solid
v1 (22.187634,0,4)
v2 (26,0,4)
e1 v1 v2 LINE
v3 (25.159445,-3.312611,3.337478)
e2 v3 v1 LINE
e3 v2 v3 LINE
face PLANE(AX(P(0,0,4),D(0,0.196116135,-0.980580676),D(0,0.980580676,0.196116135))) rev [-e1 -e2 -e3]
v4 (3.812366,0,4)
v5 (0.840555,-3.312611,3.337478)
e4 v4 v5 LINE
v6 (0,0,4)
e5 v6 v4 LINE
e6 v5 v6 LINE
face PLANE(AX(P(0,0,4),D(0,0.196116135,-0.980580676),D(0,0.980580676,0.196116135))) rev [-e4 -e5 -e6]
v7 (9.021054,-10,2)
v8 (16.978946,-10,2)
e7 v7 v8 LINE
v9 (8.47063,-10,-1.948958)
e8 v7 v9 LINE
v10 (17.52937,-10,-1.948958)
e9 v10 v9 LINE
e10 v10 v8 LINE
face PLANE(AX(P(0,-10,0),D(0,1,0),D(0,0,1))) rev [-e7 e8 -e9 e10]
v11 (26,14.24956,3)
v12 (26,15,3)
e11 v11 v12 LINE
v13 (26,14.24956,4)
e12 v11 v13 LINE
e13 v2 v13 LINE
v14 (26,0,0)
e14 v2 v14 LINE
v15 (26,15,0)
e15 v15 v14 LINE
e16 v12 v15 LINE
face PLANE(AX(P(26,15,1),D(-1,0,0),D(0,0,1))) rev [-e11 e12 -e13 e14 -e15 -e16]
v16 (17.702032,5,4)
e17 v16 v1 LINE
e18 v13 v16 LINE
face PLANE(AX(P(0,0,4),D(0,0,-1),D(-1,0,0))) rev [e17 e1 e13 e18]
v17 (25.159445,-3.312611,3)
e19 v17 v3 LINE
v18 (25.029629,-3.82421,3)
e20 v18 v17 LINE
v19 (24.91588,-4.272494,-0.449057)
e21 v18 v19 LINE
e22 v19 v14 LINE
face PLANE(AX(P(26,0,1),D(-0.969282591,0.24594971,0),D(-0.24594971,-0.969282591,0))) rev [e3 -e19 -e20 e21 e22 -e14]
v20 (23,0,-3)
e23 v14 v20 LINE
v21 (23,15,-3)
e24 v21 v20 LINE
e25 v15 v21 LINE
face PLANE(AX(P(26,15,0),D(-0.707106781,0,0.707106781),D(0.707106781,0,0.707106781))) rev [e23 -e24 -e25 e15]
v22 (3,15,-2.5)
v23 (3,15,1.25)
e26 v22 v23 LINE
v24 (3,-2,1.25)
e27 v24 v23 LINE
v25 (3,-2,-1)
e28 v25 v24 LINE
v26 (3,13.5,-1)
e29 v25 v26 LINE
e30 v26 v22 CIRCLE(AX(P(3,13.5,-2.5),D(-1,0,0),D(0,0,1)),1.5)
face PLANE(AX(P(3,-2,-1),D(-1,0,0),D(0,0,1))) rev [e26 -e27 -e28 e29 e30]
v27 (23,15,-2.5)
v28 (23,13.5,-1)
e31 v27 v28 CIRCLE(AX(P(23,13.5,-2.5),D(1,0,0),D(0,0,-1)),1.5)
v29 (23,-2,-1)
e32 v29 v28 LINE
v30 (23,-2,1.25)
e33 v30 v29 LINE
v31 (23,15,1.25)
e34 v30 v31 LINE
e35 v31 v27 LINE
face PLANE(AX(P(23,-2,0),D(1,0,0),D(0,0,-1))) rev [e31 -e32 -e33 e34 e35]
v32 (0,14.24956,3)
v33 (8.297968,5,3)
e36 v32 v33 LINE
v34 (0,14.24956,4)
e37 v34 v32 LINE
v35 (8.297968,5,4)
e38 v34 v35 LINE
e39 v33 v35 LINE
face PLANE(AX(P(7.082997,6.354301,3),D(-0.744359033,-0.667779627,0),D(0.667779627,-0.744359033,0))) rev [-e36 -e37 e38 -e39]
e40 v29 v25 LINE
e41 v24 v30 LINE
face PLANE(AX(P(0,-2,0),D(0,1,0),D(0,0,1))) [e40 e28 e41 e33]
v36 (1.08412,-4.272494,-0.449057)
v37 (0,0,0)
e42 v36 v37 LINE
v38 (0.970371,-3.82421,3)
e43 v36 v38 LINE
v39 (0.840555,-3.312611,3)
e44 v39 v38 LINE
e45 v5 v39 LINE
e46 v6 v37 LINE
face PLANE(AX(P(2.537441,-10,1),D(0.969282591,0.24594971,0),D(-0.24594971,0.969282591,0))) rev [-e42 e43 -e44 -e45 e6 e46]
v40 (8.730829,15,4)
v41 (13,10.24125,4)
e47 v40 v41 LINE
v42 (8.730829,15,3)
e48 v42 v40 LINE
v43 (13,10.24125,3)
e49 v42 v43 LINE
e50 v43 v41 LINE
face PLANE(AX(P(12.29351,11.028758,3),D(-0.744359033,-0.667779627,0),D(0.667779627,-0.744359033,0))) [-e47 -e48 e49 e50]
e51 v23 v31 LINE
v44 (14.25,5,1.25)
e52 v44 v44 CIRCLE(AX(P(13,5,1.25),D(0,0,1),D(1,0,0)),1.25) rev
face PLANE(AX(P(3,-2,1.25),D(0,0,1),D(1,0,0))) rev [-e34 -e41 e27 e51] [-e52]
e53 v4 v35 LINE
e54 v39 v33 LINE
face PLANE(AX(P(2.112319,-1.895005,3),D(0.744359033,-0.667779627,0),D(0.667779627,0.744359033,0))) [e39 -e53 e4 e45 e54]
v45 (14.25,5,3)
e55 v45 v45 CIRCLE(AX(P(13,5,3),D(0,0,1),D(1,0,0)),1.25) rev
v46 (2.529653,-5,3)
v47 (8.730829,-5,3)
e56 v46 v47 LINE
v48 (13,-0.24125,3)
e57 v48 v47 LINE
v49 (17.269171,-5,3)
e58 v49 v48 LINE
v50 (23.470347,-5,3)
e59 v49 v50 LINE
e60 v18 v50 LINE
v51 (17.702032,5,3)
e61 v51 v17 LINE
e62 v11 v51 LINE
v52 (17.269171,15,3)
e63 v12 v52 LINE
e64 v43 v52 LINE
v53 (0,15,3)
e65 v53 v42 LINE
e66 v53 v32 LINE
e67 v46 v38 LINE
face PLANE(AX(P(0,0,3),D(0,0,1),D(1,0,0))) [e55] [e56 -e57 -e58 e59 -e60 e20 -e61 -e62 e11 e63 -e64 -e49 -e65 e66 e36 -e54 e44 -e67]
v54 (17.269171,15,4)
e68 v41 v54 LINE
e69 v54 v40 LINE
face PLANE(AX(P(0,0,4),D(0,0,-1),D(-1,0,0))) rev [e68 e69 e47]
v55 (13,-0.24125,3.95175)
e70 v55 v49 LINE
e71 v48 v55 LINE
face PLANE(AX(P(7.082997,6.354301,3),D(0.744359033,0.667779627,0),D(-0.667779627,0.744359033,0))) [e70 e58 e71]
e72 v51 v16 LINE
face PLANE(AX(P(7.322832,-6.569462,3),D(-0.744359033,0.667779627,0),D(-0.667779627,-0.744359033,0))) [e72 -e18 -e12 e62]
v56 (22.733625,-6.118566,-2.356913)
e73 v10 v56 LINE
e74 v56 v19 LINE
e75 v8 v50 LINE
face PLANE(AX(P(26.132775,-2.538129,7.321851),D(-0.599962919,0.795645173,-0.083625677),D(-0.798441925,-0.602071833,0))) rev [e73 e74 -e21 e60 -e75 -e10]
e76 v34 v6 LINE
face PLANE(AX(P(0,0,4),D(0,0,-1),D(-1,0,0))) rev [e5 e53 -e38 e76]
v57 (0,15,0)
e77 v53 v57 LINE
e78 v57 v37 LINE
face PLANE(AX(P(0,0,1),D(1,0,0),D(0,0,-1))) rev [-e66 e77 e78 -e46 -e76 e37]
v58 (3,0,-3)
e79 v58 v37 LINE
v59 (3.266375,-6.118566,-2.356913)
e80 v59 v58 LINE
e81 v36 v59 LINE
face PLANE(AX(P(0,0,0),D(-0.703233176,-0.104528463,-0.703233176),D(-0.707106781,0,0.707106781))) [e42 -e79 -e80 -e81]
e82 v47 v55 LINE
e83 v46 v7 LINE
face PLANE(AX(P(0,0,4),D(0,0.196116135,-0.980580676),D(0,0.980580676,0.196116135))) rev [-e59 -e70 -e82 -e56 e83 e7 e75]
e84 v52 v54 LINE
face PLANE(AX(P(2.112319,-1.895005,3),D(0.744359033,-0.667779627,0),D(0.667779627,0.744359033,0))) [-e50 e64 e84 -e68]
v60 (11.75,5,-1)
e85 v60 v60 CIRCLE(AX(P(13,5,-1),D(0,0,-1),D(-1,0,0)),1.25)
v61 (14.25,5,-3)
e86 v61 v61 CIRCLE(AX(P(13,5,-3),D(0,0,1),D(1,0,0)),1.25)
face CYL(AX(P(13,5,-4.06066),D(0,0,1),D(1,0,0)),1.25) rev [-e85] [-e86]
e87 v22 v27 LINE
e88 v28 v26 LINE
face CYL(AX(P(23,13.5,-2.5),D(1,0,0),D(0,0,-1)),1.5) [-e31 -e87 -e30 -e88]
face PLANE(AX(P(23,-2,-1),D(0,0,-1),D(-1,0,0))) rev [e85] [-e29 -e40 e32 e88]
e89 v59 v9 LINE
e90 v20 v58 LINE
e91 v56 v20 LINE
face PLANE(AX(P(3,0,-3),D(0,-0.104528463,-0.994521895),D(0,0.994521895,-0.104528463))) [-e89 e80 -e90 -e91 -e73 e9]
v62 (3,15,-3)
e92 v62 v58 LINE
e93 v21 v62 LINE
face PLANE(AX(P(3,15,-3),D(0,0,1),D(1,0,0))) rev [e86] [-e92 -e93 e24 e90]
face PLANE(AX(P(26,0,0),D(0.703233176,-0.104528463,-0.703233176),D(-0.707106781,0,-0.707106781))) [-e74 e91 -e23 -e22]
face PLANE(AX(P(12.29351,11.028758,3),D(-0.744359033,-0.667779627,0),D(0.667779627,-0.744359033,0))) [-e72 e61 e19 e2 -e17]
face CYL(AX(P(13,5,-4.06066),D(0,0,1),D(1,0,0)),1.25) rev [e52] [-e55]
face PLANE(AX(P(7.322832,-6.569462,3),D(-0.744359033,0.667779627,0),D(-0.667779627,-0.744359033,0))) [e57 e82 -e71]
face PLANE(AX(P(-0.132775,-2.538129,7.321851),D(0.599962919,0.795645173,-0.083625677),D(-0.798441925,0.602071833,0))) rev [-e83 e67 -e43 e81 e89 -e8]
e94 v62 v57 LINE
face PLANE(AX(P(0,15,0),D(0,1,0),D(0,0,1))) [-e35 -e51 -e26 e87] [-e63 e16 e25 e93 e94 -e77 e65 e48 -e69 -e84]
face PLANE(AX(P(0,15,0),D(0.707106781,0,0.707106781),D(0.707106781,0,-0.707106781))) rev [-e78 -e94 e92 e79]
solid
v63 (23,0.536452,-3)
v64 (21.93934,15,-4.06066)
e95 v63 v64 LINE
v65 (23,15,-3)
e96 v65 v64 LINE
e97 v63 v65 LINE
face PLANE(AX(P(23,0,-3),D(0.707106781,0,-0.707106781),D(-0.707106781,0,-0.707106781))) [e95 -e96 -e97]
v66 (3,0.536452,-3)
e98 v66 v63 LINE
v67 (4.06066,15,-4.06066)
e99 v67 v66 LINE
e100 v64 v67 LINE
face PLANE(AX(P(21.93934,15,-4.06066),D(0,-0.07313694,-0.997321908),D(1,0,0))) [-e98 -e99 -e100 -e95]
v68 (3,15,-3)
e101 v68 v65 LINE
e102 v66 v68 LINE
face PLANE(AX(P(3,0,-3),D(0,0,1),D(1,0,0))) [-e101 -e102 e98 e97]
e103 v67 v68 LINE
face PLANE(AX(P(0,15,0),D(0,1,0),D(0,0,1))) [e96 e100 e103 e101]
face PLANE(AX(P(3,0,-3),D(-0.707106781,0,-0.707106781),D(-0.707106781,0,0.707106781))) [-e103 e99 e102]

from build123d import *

# Parameters (mm, degrees)
EXTRUDE_1_DEPTH           = 15
EXTRUDE_1_OTHER_WAY_DEPTH = 10
EXTRUDE_1_OTHER_WAY_TAPER = 6
CUT_EXTRUDE_1_DEPTH       = 17
EXTRUDE_2_DEPTH           = 1
EXTRUDE_3_REACH           = 32.166
EXTRUDE_4_DEPTH           = 3
CUT_EXTRUDE_3_DEPTH       = 31.282007959
EXTRUDE_5_DEPTH           = 15
CHAMFER_2_SIZE            = 15
CHAMFER_2_SIZE_2          = 1.1
CUT_EXTRUDE_2_DEPTH       = 31.430248211
CUT_EXTRUDE_2_DEPTH_BACK  = 31.430248211
SKETCH_3_R                = 1.25
SKETCH_8_R                = 1.25
CUT_EXTRUDE_6_DEPTH       = 1
CUT_EXTRUDE_7_DEPTH       = 10
FILLET_1_R                = 1.5
SKETCH_13_W               = 20
SKETCH_13_H               = 0.25
CUT_EXTRUDE_8_DEPTH       = 17


with BuildPart() as part:
    # Эскиз1 → Бобышка-Вытянуть1 (new body)
    with BuildSketch(Plane(origin=(0, 0, 0), x_dir=(1, 0, 0), z_dir=(0, 1, 0))):
        Polygon((0, 0), (3, 0), (13, 0), (26, 0), (23, 3), (3, 3), align=None)
    extrude(amount=EXTRUDE_1_DEPTH)

    # Эскиз1 → Бобышка-Вытянуть1 other way (add)
    with BuildSketch(Plane(origin=(0, 0, 0), x_dir=(1, 0, 0), z_dir=(0, 1, 0))):
        Polygon((0, 0), (3, 0), (13, 0), (26, 0), (23, 3), (3, 3), align=None)
    extrude(amount=-EXTRUDE_1_OTHER_WAY_DEPTH, taper=EXTRUDE_1_OTHER_WAY_TAPER)

    # Эскиз2 → Вырез-Вытянуть1 (cut)
    with BuildSketch(Plane(origin=(0, 15, 0), x_dir=(1, 0, 0), z_dir=(0, 1, 0))):
        Polygon((13, 0), (23, 0), (23, 1), (3, 1), (3, 0), align=None)
    extrude(amount=-CUT_EXTRUDE_1_DEPTH, mode=Mode.SUBTRACT)

    # Эскиз4 → Бобышка-Вытянуть2 (add)
    with BuildSketch(Plane.XY):
        Polygon((0, 15), (3, 15), (3, -2), (23, -2), (23, 15), (26, 15), (26, 0), (23.462559298, -10), (2.537440702, -10), (0, 0), align=None)
    extrude(amount=EXTRUDE_2_DEPTH)

    # Эскиз5 → Бобышка-Вытянуть3 (add, up to next)
    with BuildSketch(Plane(origin=(0, 0, 0), x_dir=(-1, 0, 0), z_dir=(0, 0, -1)), mode=Mode.PRIVATE) as extrude_3_sk1:
        Polygon((-26, 0), (-23.462559298, -10), (-2.537440702, -10), (0, 0), (-3, 0), (-3, -2), (-23, -2), (-23, 0), align=None)
    extrude_3_tool1 = extrude(extrude_3_sk1.sketch, amount=EXTRUDE_3_REACH, mode=Mode.PRIVATE) - part.part
    add(extrude_3_tool1.solids().sort_by_distance((13, -5.604799, 0))[0])

    # Эскиз6 → Бобышка-Вытянуть4 (add)
    with BuildSketch(Plane.XY.offset(1)):
        Polygon((0, 15), (26, 15), (26, 0), (23.462559298, -10), (2.537440702, -10), (0, 0), align=None)
    extrude(amount=EXTRUDE_4_DEPTH)

    # Эскиз7 → Вырез-Вытянуть3 (cut, through all)
    with BuildSketch(Plane(origin=(26, 0, 0), x_dir=(0, 0, -1), z_dir=(1, 0, 0))):
        Polygon((-4, 0), (-2, -10), (-4, -10), align=None)
    extrude(amount=-CUT_EXTRUDE_3_DEPTH, mode=Mode.SUBTRACT)

    # Эскиз3 → Вырез-Вытянуть2 (cut, two sides: drawn at the far end of the back side and taken through both)
    with BuildSketch(Plane.XY.offset(-1).offset(-CUT_EXTRUDE_2_DEPTH_BACK)):
        with Locations((13, 5)):
            Circle(SKETCH_3_R)
    extrude(amount=CUT_EXTRUDE_2_DEPTH + CUT_EXTRUDE_2_DEPTH_BACK, mode=Mode.SUBTRACT)

    # Эскиз8 → Вырез-Вытянуть6 (cut)
    # profile 1 of 9: a face of its own
    with BuildSketch(Plane.XY.offset(4)):
        Polygon((0, 15), (8.73082864, 15), (1.328128151, 23.251624877), (-3.882385082, 18.577167491), (0, 14.249559563), align=None)
    # profile 2 of 9: a face of its own
    with BuildSketch(Plane.XY.offset(4)):
        Polygon((8.297967991, 5), (13, 10.241250048), (8.73082864, 15), (0, 15), (0, 14.249559563), (2.253001305, 11.738189335), align=None)
    # profile 3 of 9: a face of its own
    with BuildSketch(Plane.XY.offset(4)):
        Polygon((13.216430324, 0), (15.605256616, 2.662771307), (17.702032009, 5), (13, 10.241250048), (8.297967991, 5), (12.783569676, 0), align=None)
        with Locations((13, 5)):
            Circle(SKETCH_8_R, mode=Mode.SUBTRACT)
    # profile 4 of 9: a face of its own
    with BuildSketch(Plane.XY.offset(4)):
        Polygon((13, 10.241250048), (17.702032009, 5), (26, 14.249559563), (26, 15), (17.26917136, 15), align=None)
    # profile 5 of 9: a face of its own
    with BuildSketch(Plane.XY.offset(4)):
        Polygon((22.187633693, 0), (13.216430324, 0), (13, -0.241250048), (22.828799983, -11.197193837), (28.039313215, -6.522736451), align=None)
    # profile 6 of 9: a face of its own
    with BuildSketch(Plane.XY.offset(4)):
        Polygon((17.702032009, 5), (15.605256616, 2.662771307), (13.216430324, 0), (22.187633693, 0), align=None)
    # profile 7 of 9: a face of its own
    with BuildSketch(Plane.XY.offset(4)):
        Polygon((4.245226956, -10), (13, -0.241250048), (12.783569676, 0), (3.812366307, 0), (-0.965286277, -5.325542614), align=None)
    # profile 8 of 9: a face of its own
    with BuildSketch(Plane.XY.offset(4)):
        Polygon((3.812366307, 0), (12.783569676, 0), (8.297967991, 5), align=None)
    # profile 9 of 9: a face of its own
    with BuildSketch(Plane.XY.offset(4)):
        Polygon((13, -0.241250048), (13.216430324, 0), (12.783569676, 0), align=None)
    extrude(amount=-CUT_EXTRUDE_6_DEPTH, mode=Mode.SUBTRACT)

    # Эскиз9 → Вырез-Вытянуть7 (cut)
    with BuildSketch(Plane(origin=(0, -0.311867536, -2.967221401), x_dir=(-1, 0, 0), z_dir=(0, -0.1045284632676535, -0.9945218953682734))):
        Polygon((-26.132775008, -3.289566809), (-16.54562193, -10.479237314), (-26.132775008, -10.479237314), align=None)
        Polygon((0.132775008, -10.479237314), (0.132775008, -3.289566809), (-9.45437807, -10.479237314), align=None)
    extrude(amount=-CUT_EXTRUDE_7_DEPTH, mode=Mode.SUBTRACT)

    # Скругление1
    fillet_1_edges = [part.edges().sort_by_distance(p)[0] for p in [
        (13, 15, -1),
    ]]
    fillet(fillet_1_edges, radius=FILLET_1_R)

    # Эскиз13 → Вырез-Вытянуть8 (cut)
    with BuildSketch(Plane(origin=(0, 15, 0), x_dir=(1, 0, 0), z_dir=(0, 1, 0))):
        with Locations((13, -1.125)):
            Rectangle(SKETCH_13_W, SKETCH_13_H)
    extrude(amount=-CUT_EXTRUDE_8_DEPTH, mode=Mode.SUBTRACT)


with BuildPart() as body_2:
    # Эскиз11 → Бобышка-Вытянуть5 (new body)
    with BuildSketch(Plane(origin=(0, 15, 0), x_dir=(1, 0, 0), z_dir=(0, 1, 0))):
        Polygon((3, 3), (4.060660172, 4.060660172), (21.939339828, 4.060660172), (23, 3), align=None)
    extrude(amount=-EXTRUDE_5_DEPTH)

    # Фаска2
    # the kernel refuses this chamfer: 15, 1.1 mm, written as the material it takes off along each edge
    with BuildSketch(Plane(origin=(-34.935477004, 0, -4.060660172), x_dir=(0, 0.9999960428385148, -0.0028132378696003233), z_dir=(1, 0, 0))) as chamfer_2_piece_1:
        Polygon((CHAMFER_2_SIZE * 0.999996042839, CHAMFER_2_SIZE * 0.0028132378696), (-CHAMFER_2_SIZE_2 * 0.0028132378696, CHAMFER_2_SIZE_2 * 0.999996042839), (0, 0), align=None)
    extrude(amount=95.870954008, mode=Mode.SUBTRACT)


solid = Compound([part.part, body_2.part])
